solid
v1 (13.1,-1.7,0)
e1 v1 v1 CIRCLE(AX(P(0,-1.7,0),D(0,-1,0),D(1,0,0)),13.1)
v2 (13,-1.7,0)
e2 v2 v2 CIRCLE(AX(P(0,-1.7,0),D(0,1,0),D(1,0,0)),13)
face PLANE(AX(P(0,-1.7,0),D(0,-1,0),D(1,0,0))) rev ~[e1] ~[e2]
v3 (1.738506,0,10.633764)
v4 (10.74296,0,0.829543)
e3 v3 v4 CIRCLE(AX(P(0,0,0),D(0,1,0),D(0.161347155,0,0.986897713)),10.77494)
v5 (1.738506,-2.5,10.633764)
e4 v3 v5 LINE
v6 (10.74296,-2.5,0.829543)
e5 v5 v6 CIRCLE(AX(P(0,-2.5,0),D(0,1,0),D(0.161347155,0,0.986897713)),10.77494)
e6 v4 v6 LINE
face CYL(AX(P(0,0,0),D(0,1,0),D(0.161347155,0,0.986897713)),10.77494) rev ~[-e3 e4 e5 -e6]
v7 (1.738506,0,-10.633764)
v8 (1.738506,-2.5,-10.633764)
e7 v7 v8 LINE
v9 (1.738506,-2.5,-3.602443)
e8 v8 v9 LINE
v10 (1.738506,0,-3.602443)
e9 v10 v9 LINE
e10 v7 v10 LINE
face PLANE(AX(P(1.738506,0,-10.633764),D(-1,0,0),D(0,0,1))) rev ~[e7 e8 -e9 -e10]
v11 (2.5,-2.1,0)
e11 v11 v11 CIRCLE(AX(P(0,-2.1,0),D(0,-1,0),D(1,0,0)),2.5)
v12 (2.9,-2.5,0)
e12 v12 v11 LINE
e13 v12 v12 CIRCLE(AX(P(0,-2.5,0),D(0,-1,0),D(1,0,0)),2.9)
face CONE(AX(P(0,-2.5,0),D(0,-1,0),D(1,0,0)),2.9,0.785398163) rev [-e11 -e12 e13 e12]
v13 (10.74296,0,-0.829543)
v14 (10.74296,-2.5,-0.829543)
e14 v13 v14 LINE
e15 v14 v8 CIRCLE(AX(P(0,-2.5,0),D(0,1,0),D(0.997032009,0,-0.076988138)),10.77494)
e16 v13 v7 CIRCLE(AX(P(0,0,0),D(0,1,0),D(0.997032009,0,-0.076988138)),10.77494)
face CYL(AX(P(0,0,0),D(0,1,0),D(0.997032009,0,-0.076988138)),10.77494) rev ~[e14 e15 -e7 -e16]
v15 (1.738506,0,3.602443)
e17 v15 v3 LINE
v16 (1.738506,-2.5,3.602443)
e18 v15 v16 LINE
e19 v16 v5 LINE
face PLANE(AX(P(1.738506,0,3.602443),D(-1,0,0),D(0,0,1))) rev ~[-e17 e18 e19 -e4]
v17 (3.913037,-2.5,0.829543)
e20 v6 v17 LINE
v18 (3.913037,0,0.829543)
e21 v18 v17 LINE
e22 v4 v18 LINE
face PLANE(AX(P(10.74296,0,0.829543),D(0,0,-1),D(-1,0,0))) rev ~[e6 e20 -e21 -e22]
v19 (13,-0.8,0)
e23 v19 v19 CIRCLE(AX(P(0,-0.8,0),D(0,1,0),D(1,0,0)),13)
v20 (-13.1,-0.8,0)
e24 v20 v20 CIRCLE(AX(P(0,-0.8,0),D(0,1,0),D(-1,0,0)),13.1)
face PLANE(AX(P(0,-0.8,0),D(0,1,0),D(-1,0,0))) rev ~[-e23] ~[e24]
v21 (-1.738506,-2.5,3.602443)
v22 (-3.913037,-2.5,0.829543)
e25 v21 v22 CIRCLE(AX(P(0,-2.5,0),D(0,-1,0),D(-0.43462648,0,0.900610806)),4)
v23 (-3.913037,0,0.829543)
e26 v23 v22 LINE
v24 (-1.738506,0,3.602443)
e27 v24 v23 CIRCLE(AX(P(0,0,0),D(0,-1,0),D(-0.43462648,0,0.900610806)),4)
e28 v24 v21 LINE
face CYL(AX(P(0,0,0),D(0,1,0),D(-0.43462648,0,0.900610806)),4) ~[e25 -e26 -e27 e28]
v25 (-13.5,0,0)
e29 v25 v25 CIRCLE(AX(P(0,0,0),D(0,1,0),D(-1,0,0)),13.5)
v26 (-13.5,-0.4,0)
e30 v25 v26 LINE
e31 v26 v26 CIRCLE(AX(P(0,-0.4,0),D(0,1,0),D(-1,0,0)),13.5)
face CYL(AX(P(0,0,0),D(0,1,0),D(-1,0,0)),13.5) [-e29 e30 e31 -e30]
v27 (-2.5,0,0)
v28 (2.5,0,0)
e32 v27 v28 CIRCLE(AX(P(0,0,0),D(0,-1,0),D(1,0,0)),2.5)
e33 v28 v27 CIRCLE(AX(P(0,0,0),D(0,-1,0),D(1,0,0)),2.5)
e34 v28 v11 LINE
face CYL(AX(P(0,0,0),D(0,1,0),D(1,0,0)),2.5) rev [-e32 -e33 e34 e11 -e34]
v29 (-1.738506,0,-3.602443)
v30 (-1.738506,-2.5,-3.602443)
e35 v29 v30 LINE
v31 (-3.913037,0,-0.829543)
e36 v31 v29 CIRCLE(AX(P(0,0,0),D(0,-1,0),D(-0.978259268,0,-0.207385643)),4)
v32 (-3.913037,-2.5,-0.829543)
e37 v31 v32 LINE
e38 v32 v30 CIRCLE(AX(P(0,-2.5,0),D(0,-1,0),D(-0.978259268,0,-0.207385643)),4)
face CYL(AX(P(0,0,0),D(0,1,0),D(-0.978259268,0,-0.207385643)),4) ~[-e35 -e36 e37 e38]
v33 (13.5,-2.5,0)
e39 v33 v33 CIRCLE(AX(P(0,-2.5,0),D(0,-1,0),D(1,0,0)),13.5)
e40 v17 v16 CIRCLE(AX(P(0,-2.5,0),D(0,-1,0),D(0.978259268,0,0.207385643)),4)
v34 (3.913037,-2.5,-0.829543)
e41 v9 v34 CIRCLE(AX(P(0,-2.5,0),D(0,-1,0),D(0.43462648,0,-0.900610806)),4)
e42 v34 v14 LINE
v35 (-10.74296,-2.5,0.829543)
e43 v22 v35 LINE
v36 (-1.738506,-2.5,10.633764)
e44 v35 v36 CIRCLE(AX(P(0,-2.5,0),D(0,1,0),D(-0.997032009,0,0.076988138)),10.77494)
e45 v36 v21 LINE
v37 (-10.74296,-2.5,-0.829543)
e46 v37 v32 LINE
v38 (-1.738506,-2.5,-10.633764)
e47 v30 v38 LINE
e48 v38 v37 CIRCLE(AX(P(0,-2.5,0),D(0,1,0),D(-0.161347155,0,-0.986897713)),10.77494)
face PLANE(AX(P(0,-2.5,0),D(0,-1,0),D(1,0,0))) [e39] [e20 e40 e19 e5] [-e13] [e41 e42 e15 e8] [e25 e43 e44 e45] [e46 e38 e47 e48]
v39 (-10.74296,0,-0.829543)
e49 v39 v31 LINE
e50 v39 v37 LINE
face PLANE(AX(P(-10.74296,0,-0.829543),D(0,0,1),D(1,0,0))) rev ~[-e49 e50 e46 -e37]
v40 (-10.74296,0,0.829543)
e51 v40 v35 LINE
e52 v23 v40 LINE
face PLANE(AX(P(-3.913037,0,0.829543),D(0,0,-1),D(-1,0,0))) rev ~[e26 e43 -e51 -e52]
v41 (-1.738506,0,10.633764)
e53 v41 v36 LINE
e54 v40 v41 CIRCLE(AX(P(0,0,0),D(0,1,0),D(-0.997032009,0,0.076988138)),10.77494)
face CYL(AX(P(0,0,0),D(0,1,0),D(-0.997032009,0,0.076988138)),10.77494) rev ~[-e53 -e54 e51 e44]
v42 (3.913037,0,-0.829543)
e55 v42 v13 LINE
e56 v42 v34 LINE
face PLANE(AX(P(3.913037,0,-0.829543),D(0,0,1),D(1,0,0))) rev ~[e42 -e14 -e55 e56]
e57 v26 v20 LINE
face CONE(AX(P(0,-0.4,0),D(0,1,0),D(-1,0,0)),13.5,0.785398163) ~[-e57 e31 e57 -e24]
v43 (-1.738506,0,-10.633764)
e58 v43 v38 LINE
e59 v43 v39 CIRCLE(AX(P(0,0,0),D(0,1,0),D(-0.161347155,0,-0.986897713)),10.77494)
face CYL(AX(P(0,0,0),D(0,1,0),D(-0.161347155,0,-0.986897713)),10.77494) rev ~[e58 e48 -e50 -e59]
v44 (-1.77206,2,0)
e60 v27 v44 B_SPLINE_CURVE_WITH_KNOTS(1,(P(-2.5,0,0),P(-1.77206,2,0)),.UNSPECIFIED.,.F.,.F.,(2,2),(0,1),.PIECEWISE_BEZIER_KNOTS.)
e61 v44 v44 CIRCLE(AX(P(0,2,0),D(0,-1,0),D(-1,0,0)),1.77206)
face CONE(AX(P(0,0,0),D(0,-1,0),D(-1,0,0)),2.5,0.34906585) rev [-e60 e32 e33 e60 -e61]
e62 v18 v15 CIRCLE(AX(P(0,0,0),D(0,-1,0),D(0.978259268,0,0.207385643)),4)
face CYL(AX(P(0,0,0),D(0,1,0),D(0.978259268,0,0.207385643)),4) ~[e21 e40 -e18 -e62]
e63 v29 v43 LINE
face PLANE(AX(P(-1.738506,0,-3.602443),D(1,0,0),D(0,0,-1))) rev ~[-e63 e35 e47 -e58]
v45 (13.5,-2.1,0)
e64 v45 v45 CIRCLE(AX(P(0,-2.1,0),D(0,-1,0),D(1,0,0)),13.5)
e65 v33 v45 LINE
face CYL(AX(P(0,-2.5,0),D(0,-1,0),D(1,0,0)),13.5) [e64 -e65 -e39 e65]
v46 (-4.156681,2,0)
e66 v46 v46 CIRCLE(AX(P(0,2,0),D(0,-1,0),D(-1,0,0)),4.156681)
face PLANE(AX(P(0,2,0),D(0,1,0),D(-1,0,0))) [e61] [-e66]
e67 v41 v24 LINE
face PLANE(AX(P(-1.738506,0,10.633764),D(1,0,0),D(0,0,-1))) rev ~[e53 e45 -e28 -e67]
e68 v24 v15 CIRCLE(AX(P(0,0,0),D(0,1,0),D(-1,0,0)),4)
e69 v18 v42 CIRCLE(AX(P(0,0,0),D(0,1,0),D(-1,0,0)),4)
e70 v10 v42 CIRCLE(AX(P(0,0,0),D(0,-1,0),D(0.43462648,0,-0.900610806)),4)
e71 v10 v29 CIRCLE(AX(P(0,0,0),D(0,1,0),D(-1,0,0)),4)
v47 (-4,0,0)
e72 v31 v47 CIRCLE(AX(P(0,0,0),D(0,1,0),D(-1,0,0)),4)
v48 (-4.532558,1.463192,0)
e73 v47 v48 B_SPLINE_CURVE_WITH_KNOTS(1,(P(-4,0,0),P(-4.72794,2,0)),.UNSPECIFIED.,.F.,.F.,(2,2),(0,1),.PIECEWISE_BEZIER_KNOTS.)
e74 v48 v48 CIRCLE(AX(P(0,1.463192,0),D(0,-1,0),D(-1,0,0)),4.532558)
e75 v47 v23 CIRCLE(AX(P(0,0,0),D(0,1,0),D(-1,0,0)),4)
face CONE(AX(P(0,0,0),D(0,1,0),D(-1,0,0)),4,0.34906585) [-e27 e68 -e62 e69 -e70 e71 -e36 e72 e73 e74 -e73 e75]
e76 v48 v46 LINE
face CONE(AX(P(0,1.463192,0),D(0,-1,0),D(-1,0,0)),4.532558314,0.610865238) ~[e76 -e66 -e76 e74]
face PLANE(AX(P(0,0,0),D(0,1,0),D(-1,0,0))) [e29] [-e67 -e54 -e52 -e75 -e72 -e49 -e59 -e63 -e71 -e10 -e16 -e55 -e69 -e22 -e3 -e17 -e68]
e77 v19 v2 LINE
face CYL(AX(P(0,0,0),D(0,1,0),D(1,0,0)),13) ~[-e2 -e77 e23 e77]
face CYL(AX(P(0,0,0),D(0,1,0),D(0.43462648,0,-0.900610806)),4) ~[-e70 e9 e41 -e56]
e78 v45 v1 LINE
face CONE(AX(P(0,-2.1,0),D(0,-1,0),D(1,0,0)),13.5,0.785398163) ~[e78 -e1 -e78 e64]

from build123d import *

# Parameters (mm, degrees)
F0_R     = 13
F0_R_2   = 2.5
F1_DEPTH = 2.5
F2_R     = 13.5
F2_R_2   = 10.9075922355
F3_DEPTH = 0.8
F4_R     = 13.5
F4_R_2   = 11.2490689916
F5_DEPTH = 0.8
F6_R     = 4
F6_R_2   = 2.5
F7_DEPTH = 2
F7_TAPER = -20


# Not quite as in the source:
# - a fillet or chamfer that OpenCascade refuses, or shapes differently, is made with other operations: its cross-section is extruded or revolved along the edge and cut away or added


with BuildPart() as f1:
    # F0 (on Front) → F1 (new body)
    with BuildSketch(Plane.XZ):
        Circle(F0_R)
        with BuildLine():
            ThreePointArc((-1.7385059182, -10.6337636412), (-7.9358324082, -7.2884769323), (-10.7429600727, -0.8295425725))
            Line((-10.7429600727, -0.8295425725), (-3.9130370712, -0.8295425725))
            ThreePointArc((-3.9130370712, -0.8295425725), (-3.1475751054, -2.468353896), (-1.7385059182, -3.6024432227))
            Line((-1.7385059182, -3.6024432227), (-1.7385059182, -10.6337636412))
        make_face(mode=Mode.SUBTRACT)
        with BuildLine():
            Line((3.9130370712, -0.8295425725), (10.7429600727, -0.8295425725))
            ThreePointArc((10.7429600727, -0.8295425725), (7.9358324082, -7.2884769323), (1.7385059182, -10.6337636412))
            Line((1.7385059182, -10.6337636412), (1.7385059182, -3.6024432227))
            ThreePointArc((1.7385059182, -3.6024432227), (3.1475751054, -2.468353896), (3.9130370712, -0.8295425725))
        make_face(mode=Mode.SUBTRACT)
        with BuildLine():
            ThreePointArc((-1.7385059182, 3.6024432227), (-3.1475751054, 2.468353896), (-3.9130370712, 0.8295425725))
            Line((-3.9130370712, 0.8295425725), (-10.7429600727, 0.8295425725))
            ThreePointArc((-10.7429600727, 0.8295425725), (-7.9358324082, 7.2884769323), (-1.7385059182, 10.6337636412))
            Line((-1.7385059182, 10.6337636412), (-1.7385059182, 3.6024432227))
        make_face(mode=Mode.SUBTRACT)
        Circle(F0_R_2, mode=Mode.SUBTRACT)
        with BuildLine():
            ThreePointArc((1.7385059182, 10.6337636412), (7.9358324082, 7.2884769323), (10.7429600727, 0.8295425725))
            Line((10.7429600727, 0.8295425725), (3.9130370712, 0.8295425725))
            ThreePointArc((3.9130370712, 0.8295425725), (3.1475751054, 2.468353896), (1.7385059182, 3.6024432227))
            Line((1.7385059182, 3.6024432227), (1.7385059182, 10.6337636412))
        make_face(mode=Mode.SUBTRACT)
    extrude(amount=F1_DEPTH)

    # F2 (on face) → F3 (join)
    with BuildSketch(Plane(origin=(0, 0, 0), x_dir=(-1, 0, 0), z_dir=(0, 1, 0))):
        Circle(F2_R)
        Circle(F2_R_2, mode=Mode.SUBTRACT)
    extrude(amount=-F3_DEPTH)

    # F4 (on face) → F5 (join)
    with BuildSketch(Plane.XZ.offset(2.5)):
        Circle(F4_R)
        Circle(F4_R_2, mode=Mode.SUBTRACT)
    extrude(amount=-F5_DEPTH)

    # F6 (on face) → F7 (join)
    with BuildSketch(Plane(origin=(0, 0, 0), x_dir=(-1, 0, 0), z_dir=(0, 1, 0))):
        Circle(F6_R)
        Circle(F6_R_2, mode=Mode.SUBTRACT)
    extrude(amount=F7_DEPTH, taper=F7_TAPER)

    # F8: chamfer of 0.4 on 4 edges, made by hand

    # F8_s1 → F8_t2 (revolve, cut)
    with BuildSketch(Plane.XY):
        Polygon((13.5, -2.1), (13.1, -1.7), (13.5, -1.7), align=None)
    revolve(axis=Axis((0, -1.7, 0), (0, -1, 0)), mode=Mode.SUBTRACT)

    # F8_s3 → F8_t4 (revolve, cut)
    with BuildSketch(Plane.XY):
        Polygon((-13.5, -0.4), (-13.1, -0.8), (-13.5, -0.8), align=None)
    revolve(axis=Axis((0, -0.8, 0), (0, 1, 0)), mode=Mode.SUBTRACT)

    # F8_s5 → F8_t6 (revolve, cut)
    with BuildSketch(Plane.XY):
        Polygon((2.9, -2.5), (2.5, -2.1), (2.5, -2.5), align=None)
    revolve(axis=Axis((0, -2.5, 0), (0, -1, 0)), mode=Mode.SUBTRACT)

    # F8_s7 → F8_t8 (revolve, cut)
    with BuildSketch(Plane.XY):
        Polygon((-4.5325583141, 1.4631919427), (-4.1566812658, 2), (-4.7279404685, 2), align=None)
    revolve(axis=Axis((0, 2, 0), (0, -1, 0)), mode=Mode.SUBTRACT)


solid = f1.part
